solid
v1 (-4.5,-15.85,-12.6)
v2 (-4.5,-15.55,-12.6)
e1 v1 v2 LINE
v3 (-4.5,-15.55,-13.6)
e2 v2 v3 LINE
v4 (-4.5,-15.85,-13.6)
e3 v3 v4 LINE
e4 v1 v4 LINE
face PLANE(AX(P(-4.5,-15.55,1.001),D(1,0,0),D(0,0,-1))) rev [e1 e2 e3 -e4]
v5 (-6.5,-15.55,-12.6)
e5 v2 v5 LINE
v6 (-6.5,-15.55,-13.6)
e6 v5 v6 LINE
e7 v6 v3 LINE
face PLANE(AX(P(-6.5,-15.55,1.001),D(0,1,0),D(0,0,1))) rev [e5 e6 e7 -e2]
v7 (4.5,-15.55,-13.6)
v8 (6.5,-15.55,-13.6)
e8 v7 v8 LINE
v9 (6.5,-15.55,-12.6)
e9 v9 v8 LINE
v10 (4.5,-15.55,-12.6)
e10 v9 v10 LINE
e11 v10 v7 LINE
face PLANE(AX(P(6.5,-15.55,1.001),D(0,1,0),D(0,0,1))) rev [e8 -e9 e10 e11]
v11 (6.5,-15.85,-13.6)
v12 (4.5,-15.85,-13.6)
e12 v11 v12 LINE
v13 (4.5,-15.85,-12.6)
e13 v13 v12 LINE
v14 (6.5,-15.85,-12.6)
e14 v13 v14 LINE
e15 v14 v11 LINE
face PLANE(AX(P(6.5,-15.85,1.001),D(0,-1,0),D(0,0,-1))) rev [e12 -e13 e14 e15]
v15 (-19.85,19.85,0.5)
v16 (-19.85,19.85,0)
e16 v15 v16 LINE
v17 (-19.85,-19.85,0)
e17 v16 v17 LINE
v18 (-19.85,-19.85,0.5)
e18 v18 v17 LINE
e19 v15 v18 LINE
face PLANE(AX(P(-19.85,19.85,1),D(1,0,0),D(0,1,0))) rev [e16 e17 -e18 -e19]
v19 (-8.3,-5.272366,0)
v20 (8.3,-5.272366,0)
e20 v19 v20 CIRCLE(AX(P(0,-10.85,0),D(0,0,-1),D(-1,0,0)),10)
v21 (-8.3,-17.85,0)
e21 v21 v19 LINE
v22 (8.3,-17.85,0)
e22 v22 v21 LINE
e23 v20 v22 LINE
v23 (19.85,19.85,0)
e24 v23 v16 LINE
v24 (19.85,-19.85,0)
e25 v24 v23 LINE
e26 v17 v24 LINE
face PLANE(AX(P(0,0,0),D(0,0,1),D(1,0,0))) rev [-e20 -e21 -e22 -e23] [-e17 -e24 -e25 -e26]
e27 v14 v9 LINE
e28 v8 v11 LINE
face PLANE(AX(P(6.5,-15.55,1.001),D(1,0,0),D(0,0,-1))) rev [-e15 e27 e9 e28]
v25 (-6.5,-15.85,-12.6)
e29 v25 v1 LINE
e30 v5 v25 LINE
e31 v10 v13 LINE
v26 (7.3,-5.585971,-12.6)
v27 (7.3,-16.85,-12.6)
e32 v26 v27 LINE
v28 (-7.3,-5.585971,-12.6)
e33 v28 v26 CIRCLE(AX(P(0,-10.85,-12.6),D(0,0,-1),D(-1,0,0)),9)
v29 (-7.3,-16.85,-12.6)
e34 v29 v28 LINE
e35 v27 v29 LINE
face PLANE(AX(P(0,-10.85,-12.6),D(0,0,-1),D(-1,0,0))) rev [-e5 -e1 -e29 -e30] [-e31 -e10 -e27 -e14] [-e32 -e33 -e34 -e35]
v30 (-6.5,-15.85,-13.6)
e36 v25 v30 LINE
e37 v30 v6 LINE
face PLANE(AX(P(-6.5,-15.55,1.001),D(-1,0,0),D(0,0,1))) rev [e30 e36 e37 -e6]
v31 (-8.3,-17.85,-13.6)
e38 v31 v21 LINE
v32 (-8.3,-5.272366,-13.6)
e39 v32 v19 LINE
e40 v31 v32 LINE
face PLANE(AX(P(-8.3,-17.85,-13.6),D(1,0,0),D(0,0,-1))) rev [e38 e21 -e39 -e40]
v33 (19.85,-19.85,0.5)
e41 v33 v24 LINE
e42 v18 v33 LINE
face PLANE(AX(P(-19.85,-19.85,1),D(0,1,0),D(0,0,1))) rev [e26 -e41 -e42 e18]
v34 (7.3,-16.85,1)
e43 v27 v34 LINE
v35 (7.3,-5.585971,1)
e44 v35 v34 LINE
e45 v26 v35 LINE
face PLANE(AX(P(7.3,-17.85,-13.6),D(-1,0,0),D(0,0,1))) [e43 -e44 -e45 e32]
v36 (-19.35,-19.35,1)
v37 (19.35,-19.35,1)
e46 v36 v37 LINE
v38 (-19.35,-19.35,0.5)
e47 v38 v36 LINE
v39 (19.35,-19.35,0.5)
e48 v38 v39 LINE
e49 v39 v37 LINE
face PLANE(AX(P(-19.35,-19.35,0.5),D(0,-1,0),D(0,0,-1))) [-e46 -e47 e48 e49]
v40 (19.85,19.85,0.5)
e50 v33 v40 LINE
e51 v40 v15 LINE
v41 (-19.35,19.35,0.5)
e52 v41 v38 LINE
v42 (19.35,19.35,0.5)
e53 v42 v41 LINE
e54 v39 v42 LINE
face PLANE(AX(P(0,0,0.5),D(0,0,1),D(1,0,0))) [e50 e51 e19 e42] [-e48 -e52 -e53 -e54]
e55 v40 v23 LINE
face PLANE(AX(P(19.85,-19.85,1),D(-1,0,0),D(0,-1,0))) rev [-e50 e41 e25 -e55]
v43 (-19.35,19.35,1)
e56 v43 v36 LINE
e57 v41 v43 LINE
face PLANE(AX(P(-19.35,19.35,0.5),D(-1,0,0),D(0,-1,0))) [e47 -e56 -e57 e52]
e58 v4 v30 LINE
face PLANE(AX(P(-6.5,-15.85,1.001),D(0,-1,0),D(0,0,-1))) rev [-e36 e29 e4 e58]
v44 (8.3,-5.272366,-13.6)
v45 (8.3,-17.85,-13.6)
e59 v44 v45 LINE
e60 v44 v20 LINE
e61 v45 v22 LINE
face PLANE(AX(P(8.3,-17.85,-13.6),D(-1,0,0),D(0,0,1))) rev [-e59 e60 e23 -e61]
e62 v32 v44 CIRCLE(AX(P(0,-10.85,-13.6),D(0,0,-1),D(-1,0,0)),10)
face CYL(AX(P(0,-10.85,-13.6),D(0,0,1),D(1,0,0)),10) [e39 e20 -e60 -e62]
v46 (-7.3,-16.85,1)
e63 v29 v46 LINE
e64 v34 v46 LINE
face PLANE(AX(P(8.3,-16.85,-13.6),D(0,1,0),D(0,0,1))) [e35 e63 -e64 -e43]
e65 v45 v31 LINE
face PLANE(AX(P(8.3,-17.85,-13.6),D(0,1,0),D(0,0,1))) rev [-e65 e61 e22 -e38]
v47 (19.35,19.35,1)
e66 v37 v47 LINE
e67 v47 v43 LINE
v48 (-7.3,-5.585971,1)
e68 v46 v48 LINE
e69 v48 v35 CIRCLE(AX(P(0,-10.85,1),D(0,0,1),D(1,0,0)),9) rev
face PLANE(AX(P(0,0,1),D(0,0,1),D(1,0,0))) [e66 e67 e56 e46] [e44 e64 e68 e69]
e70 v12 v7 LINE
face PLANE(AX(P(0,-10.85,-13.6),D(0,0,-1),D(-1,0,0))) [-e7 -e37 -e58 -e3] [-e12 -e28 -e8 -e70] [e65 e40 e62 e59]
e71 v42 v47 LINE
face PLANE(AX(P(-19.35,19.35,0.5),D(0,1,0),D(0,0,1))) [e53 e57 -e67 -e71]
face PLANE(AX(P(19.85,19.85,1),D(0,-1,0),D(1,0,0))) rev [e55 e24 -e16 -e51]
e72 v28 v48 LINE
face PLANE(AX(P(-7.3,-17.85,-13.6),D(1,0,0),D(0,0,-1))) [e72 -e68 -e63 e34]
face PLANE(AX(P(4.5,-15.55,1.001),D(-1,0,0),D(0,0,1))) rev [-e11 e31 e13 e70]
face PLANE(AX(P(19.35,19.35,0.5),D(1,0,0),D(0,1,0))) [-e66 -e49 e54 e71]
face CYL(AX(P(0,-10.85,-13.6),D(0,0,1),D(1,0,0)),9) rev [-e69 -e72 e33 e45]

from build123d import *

# Parameters (mm, degrees)
SKETCH1_W           = 39.7
SKETCH1_H           = 39.7
BOSS_EXTRUDE1_DEPTH = 1
BOSS_EXTRUDE2_DEPTH = 13.6
SHELL1_START        = -12.6
SHELL1_DEPTH        = 13.6
SKETCH3_W           = 39.7
SKETCH3_H           = 39.7
SKETCH3_W_2         = 38.7
SKETCH3_H_2         = 38.7
CUT_EXTRUDE1_DEPTH  = 0.5
CUT_EXTRUDE2_REACH  = 33.642
SKETCH4_W           = 2
SKETCH4_H           = 0.3


# Read off the part's stored shape, not the designer's step: Shell1
with BuildPart() as part:
    # Sketch1 → Boss-Extrude1 (new body)
    with BuildSketch(Plane.XY):
        Rectangle(SKETCH1_W, SKETCH1_H)
    extrude(amount=BOSS_EXTRUDE1_DEPTH)

    # Sketch2 → Boss-Extrude2 (add)
    with BuildSketch(Plane(origin=(0, 0, 0), x_dir=(-1, 0, 0), z_dir=(0, 0, -1))):
        with BuildLine():
            Line((-8.3, -17.85), (8.3, -17.85))
            Line((8.3, -17.85), (8.3, -5.272366093))
            ThreePointArc((8.3, -5.272366093), (0, -0.85), (-8.3, -5.272366093))
            Line((-8.3, -5.272366093), (-8.3, -17.85))
        make_face()
    extrude(amount=BOSS_EXTRUDE2_DEPTH)

    # Shell1 outline → Shell1 (cut)
    with BuildSketch(Plane.XY.offset(SHELL1_START)):
        with BuildLine():
            Line((7.3, -16.85), (7.3, -5.585971125))
            ThreePointArc((7.3, -5.585971125), (0, -1.85), (-7.3, -5.585971125))
            Line((-7.3, -5.585971125), (-7.3, -16.85))
            Line((-7.3, -16.85), (7.3, -16.85))
        make_face()
    extrude(amount=SHELL1_DEPTH, mode=Mode.SUBTRACT)

    # Sketch3 → Cut-Extrude1 (cut)
    with BuildSketch(Plane.XY.offset(1)):
        Rectangle(SKETCH3_W, SKETCH3_H)
        Rectangle(SKETCH3_W_2, SKETCH3_H_2, mode=Mode.SUBTRACT)
    extrude(amount=-CUT_EXTRUDE1_DEPTH, mode=Mode.SUBTRACT)

    # Sketch4 → Cut-Extrude2 (cut, up to next)
    with BuildSketch(Plane(origin=(0, 0, -13.6), x_dir=(-1, 0, 0), z_dir=(0, 0, -1)), mode=Mode.PRIVATE) as cut_extrude2_sk1:
        with Locations((-5.5, -15.7)):
            Rectangle(SKETCH4_W, SKETCH4_H)
    cut_extrude2_tool1 = extrude(cut_extrude2_sk1.sketch, amount=-CUT_EXTRUDE2_REACH, mode=Mode.PRIVATE) & part.part
    # Sketch4 → Cut-Extrude2 (cut, up to next)
    with BuildSketch(Plane(origin=(0, 0, -13.6), x_dir=(-1, 0, 0), z_dir=(0, 0, -1)), mode=Mode.PRIVATE) as cut_extrude2_sk2:
        with Locations((5.5, -15.7)):
            Rectangle(SKETCH4_W, SKETCH4_H)
    cut_extrude2_tool2 = extrude(cut_extrude2_sk2.sketch, amount=-CUT_EXTRUDE2_REACH, mode=Mode.PRIVATE) & part.part
    add(cut_extrude2_tool1.solids().sort_by_distance((5.5, -15.7, -13.6))[0], mode=Mode.SUBTRACT)
    add(cut_extrude2_tool2.solids().sort_by_distance((-5.5, -15.7, -13.6))[0], mode=Mode.SUBTRACT)


solid = part.part
